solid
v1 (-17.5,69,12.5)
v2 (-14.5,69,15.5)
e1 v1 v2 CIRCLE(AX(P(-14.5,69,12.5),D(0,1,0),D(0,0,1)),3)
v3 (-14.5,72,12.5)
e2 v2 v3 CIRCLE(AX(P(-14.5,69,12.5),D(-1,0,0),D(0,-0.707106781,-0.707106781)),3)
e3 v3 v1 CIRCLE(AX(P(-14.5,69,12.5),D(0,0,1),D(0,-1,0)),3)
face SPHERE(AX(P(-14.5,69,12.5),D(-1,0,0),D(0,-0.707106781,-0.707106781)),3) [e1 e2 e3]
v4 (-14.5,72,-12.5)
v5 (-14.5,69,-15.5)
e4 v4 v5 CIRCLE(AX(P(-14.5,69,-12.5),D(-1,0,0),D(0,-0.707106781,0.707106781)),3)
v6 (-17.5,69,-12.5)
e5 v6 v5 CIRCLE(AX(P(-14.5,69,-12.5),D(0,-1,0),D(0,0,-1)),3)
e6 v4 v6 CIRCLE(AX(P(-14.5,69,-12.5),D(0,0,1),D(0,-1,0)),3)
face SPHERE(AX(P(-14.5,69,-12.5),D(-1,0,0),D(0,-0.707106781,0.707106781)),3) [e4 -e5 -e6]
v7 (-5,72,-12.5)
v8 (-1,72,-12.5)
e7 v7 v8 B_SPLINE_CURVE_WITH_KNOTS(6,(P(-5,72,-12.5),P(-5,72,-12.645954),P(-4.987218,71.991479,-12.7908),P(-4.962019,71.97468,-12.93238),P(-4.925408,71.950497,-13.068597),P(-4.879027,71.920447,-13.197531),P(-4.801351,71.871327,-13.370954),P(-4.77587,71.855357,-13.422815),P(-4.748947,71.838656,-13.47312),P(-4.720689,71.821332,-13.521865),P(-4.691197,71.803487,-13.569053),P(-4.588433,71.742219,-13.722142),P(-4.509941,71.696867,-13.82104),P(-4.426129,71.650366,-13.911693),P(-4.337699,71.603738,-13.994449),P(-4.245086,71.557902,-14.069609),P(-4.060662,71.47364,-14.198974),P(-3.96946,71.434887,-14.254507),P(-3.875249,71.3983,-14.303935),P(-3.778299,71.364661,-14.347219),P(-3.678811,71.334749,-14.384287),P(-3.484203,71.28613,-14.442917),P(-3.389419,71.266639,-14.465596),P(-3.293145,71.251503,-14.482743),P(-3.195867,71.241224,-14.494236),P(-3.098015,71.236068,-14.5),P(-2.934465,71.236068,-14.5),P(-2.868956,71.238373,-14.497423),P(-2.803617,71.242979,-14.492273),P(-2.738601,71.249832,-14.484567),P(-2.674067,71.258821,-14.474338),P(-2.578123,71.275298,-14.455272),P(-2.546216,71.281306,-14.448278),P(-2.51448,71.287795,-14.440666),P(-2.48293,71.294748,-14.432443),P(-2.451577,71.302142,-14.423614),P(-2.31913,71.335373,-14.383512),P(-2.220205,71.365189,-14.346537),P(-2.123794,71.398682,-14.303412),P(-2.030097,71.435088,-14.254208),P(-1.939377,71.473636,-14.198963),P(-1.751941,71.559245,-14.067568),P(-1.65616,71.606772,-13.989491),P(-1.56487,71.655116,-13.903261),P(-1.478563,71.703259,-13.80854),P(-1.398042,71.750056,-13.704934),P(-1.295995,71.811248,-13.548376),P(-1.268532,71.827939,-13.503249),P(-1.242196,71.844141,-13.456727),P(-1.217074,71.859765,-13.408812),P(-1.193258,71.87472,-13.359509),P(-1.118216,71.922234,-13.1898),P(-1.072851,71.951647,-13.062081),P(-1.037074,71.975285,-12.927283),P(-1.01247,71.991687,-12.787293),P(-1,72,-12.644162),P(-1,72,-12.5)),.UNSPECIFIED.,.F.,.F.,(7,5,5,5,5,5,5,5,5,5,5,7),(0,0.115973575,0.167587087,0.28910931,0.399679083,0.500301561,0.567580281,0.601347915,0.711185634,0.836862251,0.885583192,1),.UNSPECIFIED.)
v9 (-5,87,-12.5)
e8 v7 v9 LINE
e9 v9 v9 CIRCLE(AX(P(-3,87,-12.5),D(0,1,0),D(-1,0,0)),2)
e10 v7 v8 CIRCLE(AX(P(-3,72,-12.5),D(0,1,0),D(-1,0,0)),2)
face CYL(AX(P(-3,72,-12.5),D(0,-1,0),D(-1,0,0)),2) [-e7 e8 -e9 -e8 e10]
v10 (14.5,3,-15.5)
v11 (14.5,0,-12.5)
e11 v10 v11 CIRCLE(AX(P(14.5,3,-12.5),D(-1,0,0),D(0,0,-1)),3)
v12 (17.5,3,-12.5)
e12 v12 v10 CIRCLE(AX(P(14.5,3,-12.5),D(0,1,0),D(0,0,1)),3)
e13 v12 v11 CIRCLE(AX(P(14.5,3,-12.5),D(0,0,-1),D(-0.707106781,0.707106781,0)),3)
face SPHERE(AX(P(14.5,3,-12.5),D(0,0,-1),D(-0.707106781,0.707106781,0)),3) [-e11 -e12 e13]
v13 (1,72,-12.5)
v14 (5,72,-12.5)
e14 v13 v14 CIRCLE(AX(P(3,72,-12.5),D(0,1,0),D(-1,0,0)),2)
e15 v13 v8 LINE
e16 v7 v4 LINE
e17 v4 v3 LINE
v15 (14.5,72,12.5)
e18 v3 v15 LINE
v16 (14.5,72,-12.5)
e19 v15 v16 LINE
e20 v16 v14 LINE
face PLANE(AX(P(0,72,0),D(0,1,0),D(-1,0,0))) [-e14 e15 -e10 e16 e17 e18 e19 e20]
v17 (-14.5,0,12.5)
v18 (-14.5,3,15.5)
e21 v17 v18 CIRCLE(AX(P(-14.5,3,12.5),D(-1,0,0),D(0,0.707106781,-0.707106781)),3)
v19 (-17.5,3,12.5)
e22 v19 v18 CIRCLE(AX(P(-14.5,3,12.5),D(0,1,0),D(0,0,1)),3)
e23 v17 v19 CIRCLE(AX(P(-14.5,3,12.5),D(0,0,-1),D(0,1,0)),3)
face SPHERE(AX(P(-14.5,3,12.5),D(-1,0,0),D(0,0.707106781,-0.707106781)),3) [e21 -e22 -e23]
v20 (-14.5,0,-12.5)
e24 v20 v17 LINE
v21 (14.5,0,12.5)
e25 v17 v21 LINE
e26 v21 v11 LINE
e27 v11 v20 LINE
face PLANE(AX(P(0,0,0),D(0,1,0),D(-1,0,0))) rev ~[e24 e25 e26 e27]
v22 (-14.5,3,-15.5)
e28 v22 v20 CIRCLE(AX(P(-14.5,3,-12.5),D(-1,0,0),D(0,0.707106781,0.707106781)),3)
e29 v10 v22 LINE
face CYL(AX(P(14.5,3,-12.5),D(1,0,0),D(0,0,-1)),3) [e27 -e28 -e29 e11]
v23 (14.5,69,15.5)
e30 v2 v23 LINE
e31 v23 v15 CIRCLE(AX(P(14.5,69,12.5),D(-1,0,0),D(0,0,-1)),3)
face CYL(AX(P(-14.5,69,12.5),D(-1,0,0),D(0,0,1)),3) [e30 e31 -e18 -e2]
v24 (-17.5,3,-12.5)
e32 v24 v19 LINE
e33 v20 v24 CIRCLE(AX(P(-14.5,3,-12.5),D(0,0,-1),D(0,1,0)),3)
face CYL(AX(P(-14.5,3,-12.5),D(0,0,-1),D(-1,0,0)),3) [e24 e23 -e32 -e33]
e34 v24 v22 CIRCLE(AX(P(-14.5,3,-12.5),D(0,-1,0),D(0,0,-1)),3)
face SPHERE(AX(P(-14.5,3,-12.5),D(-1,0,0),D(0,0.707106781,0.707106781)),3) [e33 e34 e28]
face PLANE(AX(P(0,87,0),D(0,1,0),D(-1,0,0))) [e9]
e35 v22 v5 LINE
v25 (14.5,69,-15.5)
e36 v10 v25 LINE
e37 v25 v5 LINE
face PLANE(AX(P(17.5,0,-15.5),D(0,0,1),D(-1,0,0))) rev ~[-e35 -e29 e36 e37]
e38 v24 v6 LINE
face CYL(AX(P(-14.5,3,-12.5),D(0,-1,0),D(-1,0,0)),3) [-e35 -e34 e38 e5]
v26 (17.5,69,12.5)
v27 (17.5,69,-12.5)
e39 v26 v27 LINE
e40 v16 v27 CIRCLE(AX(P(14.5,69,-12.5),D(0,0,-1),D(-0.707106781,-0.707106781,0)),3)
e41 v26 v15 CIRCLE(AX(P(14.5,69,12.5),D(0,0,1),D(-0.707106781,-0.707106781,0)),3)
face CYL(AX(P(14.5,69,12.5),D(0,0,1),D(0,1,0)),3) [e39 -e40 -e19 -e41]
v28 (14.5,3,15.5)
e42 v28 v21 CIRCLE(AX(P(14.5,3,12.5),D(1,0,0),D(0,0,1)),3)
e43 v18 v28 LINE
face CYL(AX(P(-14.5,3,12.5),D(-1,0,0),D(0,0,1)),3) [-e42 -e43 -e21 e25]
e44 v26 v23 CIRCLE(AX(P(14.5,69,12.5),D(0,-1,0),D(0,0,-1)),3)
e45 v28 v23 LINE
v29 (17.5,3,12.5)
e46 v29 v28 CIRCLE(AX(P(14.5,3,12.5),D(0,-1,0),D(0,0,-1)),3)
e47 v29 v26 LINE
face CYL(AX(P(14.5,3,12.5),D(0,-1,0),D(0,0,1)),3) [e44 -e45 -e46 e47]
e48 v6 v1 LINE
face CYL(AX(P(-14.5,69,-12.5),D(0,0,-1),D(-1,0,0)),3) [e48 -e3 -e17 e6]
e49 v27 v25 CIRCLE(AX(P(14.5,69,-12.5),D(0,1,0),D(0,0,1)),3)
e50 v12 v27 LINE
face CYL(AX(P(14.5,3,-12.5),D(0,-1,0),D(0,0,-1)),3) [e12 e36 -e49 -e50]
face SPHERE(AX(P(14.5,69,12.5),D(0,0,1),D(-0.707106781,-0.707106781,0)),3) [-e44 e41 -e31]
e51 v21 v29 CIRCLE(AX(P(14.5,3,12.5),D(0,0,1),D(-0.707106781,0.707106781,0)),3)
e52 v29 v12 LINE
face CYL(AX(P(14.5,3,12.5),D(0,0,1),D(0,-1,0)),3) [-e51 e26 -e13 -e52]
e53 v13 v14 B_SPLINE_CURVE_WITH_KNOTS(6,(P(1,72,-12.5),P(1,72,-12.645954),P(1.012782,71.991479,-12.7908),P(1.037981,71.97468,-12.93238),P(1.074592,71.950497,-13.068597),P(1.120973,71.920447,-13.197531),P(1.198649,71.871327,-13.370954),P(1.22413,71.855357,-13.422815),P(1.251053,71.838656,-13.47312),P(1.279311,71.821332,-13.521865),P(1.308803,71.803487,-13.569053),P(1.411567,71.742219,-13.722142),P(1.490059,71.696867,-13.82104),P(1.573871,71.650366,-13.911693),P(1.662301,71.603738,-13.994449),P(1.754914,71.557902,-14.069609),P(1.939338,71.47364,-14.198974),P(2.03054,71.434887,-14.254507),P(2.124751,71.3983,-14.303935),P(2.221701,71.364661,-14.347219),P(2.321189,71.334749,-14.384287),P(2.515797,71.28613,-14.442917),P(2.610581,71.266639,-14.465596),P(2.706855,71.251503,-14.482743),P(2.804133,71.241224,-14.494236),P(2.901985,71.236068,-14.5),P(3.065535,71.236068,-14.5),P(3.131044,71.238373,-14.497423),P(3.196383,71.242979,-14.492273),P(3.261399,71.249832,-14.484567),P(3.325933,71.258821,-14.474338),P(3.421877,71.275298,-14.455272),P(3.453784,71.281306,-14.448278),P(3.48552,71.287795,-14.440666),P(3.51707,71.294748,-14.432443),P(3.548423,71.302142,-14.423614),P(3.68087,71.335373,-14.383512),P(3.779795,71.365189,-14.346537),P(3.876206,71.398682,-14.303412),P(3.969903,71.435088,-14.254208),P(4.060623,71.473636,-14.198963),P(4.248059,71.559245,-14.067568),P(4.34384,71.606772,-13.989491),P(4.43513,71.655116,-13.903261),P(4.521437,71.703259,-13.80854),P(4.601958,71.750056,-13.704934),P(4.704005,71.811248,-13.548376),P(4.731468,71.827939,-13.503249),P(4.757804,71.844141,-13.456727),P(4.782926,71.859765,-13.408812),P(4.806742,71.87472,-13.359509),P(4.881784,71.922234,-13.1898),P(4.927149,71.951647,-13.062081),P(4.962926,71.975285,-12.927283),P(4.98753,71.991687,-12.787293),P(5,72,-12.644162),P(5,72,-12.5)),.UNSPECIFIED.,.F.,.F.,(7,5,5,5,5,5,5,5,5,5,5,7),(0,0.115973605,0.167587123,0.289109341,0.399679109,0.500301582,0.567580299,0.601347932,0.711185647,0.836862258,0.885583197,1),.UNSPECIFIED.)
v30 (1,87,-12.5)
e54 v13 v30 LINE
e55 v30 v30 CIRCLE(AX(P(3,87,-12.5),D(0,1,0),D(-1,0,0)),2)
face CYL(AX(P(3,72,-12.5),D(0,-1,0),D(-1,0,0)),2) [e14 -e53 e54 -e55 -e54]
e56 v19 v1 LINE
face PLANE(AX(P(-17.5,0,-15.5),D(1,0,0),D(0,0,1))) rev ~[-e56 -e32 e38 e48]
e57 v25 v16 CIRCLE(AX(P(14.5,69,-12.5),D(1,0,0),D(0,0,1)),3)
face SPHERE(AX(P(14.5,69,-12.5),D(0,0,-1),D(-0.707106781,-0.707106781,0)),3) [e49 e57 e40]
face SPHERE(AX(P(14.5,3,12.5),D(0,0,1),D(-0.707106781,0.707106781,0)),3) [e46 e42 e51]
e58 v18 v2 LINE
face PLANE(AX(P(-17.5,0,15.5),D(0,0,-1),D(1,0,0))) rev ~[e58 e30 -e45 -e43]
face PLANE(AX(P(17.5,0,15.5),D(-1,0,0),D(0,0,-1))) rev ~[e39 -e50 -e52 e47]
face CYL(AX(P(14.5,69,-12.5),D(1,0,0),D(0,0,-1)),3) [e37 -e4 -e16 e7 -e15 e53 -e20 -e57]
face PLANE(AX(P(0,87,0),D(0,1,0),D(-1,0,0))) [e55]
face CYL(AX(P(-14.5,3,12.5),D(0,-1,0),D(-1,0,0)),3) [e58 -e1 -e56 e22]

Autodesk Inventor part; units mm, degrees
ref_plane "YZ Plane" through (0, 0, 0) normal (1, 0, 0) x (0, 1, 0)
ref_plane "XZ Plane" through (0, 0, 0) normal (0, 1, 0) x (-1, 0, 0)
ref_plane "XY Plane" through (0, 0, 0) normal (0, 0, 1) x (1, 0, 0)
sketch "Sketch1" plane through (0, 0, 0) normal (0, 1, 0) x (-1, 0, 0)
  line L0 (17.5, 15.5) -> (-17.5, 15.5)
  line L1 (-17.5, 15.5) -> (-17.5, -15.5)
  line L2 (-17.5, -15.5) -> (17.5, -15.5)
  line L3 (17.5, -15.5) -> (17.5, 15.5)
  line L4 (17.5, 15.5) -> (-17.5, -15.5) construction
  line L5 (-17.5, 15.5) -> (17.5, -15.5) construction
  line L6 (0, -15.5) -> (0, -12.5) construction
  line L7 (0, -12.5) -> (3, -12.5) construction
  circle A0 centre (3, -12.5) radius 2
  circle A1 centre (-3, -12.5) radius 2
  point P0 (0, 0)
  dimension "d0" = 35
  dimension "d1" = 31
  dimension "d5" = 3
  dimension "d6" = 3
  dimension "d7" = 4
extrude "Extrusion1" add sketch "Sketch1" along normal blind 72 contours L3 L2 L1 L0 | A0 | A1
extrude "Extrusion2" add sketch "Sketch1" along normal blind 15 from surface at 72 contours A0 | A1
fillet "Fillet1" radius 3 12 edges at (17.5, 36, 15.5) (17.5, 36, -15.5) (-17.5, 36, 15.5) (-17.5, 36, -15.5) (17.5, 72, 0) (0, 72, 15.5) (0, 72, -15.5) (-17.5, 72, 0) (17.5, 0, 0) (0, 0, 15.5) (-17.5, 0, 0) (0, 0, -15.5)
properties part number "LEMONRC 1300 - 14.8V (35C)"
